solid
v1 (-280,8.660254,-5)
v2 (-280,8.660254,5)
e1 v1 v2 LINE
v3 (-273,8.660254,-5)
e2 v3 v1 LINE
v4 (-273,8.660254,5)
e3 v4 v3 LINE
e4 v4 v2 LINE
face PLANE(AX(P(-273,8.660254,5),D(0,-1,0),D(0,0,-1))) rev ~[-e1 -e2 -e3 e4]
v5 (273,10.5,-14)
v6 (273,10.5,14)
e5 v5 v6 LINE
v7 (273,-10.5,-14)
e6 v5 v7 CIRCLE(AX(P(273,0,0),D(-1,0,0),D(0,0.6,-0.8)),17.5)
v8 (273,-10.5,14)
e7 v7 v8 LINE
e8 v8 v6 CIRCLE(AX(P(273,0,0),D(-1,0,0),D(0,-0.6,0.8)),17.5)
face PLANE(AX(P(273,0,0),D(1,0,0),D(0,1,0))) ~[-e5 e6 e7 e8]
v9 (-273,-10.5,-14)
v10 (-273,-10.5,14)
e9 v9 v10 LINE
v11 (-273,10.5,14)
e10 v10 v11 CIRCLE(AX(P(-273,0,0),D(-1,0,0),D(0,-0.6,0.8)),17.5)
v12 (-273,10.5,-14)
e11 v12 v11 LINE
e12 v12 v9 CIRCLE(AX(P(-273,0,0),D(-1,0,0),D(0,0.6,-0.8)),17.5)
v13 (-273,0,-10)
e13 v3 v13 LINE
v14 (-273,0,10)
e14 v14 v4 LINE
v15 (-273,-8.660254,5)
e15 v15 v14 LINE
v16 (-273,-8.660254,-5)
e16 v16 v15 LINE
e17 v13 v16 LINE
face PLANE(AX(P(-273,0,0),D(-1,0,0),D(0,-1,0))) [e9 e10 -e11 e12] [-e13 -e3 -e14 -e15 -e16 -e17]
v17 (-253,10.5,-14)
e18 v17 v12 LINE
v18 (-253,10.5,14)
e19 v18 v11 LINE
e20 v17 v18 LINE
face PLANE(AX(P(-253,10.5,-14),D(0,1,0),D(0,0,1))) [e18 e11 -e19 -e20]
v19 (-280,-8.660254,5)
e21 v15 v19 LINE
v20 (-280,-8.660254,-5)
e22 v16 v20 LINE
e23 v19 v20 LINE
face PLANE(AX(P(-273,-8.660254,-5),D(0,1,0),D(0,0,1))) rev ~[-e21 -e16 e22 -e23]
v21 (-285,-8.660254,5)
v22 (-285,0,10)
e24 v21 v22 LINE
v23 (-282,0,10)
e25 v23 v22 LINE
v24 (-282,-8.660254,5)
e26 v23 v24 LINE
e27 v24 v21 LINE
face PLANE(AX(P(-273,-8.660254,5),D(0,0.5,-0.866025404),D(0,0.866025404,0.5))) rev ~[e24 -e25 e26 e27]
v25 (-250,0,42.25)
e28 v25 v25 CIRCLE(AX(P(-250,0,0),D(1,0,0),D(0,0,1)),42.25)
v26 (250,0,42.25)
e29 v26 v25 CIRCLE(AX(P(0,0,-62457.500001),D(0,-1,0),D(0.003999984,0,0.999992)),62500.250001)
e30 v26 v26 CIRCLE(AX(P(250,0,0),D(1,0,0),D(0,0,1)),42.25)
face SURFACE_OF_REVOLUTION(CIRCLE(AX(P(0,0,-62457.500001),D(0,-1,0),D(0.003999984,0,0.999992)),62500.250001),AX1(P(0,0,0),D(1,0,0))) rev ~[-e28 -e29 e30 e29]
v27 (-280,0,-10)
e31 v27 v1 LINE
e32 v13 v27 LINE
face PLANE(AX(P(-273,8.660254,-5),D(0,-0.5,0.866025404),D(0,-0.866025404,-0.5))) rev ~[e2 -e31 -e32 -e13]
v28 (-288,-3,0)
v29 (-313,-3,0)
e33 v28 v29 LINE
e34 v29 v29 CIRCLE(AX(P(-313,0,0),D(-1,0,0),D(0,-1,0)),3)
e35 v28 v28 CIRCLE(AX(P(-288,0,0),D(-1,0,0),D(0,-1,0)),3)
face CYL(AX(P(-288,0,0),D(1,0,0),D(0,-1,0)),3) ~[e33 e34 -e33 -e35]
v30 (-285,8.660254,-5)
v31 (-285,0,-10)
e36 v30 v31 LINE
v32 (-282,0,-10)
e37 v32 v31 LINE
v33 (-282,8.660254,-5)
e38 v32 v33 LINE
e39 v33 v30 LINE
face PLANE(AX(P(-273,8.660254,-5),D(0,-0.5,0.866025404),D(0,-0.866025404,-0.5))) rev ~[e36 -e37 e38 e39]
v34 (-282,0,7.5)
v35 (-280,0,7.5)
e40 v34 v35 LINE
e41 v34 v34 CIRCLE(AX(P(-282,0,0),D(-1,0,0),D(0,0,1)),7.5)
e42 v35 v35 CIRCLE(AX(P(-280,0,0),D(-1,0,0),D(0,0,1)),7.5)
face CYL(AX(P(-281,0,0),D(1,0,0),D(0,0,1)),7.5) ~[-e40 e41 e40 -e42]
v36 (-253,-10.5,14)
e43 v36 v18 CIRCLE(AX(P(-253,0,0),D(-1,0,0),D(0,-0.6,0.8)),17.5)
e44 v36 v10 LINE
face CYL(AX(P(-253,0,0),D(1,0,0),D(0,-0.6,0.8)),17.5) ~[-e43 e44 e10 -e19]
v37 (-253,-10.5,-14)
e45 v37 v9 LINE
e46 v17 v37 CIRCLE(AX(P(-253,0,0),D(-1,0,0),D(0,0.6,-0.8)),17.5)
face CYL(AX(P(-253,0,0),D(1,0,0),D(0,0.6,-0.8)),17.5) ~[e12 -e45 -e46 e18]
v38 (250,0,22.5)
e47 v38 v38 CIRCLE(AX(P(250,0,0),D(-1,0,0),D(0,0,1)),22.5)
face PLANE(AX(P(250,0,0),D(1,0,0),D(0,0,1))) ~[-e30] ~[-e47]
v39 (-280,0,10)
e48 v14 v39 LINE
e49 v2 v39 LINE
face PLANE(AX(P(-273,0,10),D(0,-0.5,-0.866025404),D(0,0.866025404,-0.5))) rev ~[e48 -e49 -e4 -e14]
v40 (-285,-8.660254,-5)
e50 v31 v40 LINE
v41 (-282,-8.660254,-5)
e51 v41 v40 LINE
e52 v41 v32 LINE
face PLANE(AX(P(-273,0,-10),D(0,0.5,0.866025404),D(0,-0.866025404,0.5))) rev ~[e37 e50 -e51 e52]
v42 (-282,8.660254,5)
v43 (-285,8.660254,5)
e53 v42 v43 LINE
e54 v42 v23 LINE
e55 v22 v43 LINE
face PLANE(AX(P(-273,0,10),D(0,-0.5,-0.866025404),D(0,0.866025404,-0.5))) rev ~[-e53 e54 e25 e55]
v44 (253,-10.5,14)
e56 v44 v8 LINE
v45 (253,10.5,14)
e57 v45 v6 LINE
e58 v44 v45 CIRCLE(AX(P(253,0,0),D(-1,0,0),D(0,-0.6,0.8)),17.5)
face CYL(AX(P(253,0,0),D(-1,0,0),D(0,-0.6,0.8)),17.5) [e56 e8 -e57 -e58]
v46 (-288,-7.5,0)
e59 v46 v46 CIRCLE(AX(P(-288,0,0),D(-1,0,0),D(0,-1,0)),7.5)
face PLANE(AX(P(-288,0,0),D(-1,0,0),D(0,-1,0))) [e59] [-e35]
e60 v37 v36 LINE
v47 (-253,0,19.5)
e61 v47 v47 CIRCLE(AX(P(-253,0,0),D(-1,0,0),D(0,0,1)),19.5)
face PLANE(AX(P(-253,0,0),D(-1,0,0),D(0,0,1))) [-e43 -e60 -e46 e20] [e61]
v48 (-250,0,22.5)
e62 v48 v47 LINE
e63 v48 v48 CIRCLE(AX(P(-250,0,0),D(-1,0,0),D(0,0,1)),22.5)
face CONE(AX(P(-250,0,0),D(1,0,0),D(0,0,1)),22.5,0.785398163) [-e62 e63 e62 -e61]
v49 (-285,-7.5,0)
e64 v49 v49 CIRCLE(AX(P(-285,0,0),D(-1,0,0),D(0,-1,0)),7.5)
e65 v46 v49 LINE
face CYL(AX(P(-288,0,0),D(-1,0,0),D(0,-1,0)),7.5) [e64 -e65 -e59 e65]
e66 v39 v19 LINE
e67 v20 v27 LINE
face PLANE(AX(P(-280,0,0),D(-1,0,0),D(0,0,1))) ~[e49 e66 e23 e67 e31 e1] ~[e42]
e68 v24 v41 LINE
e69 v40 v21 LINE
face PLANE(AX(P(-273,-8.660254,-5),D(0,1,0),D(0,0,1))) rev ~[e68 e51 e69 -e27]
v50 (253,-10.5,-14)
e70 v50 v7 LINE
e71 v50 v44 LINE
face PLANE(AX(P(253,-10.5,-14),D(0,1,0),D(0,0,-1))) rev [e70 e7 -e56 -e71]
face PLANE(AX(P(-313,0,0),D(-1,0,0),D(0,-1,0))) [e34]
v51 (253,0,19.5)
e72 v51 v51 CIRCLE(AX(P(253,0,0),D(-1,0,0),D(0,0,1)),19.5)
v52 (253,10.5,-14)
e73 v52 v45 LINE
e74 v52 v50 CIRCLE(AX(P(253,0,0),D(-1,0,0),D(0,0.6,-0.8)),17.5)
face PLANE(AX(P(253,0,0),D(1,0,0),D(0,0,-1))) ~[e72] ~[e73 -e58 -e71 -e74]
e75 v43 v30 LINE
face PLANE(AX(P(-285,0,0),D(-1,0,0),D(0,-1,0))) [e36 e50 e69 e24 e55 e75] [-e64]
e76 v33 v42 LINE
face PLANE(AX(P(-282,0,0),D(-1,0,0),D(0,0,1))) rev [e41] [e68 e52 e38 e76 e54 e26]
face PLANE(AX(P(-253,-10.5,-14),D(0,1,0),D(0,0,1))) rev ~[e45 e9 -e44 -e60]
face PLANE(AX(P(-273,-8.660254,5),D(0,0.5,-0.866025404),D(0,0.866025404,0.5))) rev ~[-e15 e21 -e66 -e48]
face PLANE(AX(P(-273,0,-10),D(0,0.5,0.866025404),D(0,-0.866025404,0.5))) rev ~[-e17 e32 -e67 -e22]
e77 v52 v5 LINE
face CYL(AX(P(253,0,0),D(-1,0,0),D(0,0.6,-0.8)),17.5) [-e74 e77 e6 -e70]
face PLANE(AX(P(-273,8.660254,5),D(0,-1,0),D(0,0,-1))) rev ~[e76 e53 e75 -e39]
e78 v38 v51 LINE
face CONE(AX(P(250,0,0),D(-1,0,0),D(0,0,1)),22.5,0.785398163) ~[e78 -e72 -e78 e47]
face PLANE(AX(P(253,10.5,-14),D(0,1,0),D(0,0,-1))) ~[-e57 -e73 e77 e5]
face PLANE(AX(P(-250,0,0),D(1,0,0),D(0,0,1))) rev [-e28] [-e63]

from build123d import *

# Parameters (mm, degrees)
F0_W      = 500
F0_H      = 42.25
F4_W      = 21
F4_H      = 28
F5_DEPTH  = 20
F7_DEPTH  = 15
F8_R      = 7.5
F9_DEPTH  = 3
F10_W     = 2
F10_H     = 2.5
F12_R     = 3
F13_DEPTH = 25


# Not quite as in the source:
# - a pattern or mirror of a feature is missing from the dataset's text; its kind, count and spacing are read off the source's solid


with BuildPart() as f1:
    # F0 (on Front) → F1 (revolve)
    with BuildSketch(Plane.XZ):
        with Locations((0, 21.125)):
            Rectangle(F0_W, F0_H)
        with BuildLine():
            ThreePointArc((250, 42.25), (0, 42.75), (-250, 42.25))
            Line((-250, 42.25), (250, 42.25))
        make_face()
    revolve(axis=Axis((0, 0, 0), (1, 0, 0)))

    # F2 (on Front) → F3 (revolve)
    with BuildSketch(Plane.XZ):
        Polygon((-253, 0), (-250, 0), (-250, 22.5), (-253, 19.5), align=None)
    f3 = revolve(axis=Axis((-251.5, 0, 0), (-1, 0, 0)))

    # F3_copies: F3 across plane
    add(f3.mirror(Plane(origin=(0, 0, 0), x_dir=(0, 0, 1), z_dir=(1, 0, 0))))

    # F4 (on face) → F5 (join)
    with BuildSketch(Plane(origin=(-253, 0, 0), x_dir=(0, -1, 0), z_dir=(-1, 0, 0))):
        Rectangle(F4_W, F4_H)
        with BuildLine():
            ThreePointArc((10.5, 14), (0, 17.5), (-10.5, 14))
            Line((-10.5, 14), (10.5, 14))
        make_face()
        with BuildLine():
            Line((10.5, -14), (-10.5, -14))
            ThreePointArc((-10.5, -14), (0, -17.5), (10.5, -14))
        make_face()
    f5 = extrude(amount=F5_DEPTH)

    # F5_copies: F5 across plane
    add(f5.mirror(Plane(origin=(0, 0, 0), x_dir=(0, 0, 1), z_dir=(1, 0, 0))))

    # F6 (on face) → F7 (join)
    with BuildSketch(Plane(origin=(-273, 0, 0), x_dir=(0, -1, 0), z_dir=(-1, 0, 0))):
        Polygon((0, 10), (-8.6602540378, 5), (-8.6602540378, -5), (0, -10), (8.6602540378, -5), (8.6602540378, 5), align=None)
    extrude(amount=F7_DEPTH)

    # F8 (on face) → F9 (cut)
    with BuildSketch(Plane(origin=(-288, 0, 0), x_dir=(0, -1, 0), z_dir=(-1, 0, 0))):
        Polygon((0, 10), (-8.6602540378, 5), (-8.6602540378, -5), (0, -10), (8.6602540378, -5), (8.6602540378, 5), align=None)
        Circle(F8_R, mode=Mode.SUBTRACT)
    extrude(amount=-F9_DEPTH, mode=Mode.SUBTRACT)

    # F10 (on Front) → F11 (revolve, cut)
    with BuildSketch(Plane.XZ):
        with Locations((-281, 8.75)):
            Rectangle(F10_W, F10_H)
    revolve(axis=Axis((-10, 0, 0), (-1, 0, 0)), mode=Mode.SUBTRACT)

    # F12 (on face) → F13 (join)
    with BuildSketch(Plane(origin=(-288, 0, 0), x_dir=(0, -1, 0), z_dir=(-1, 0, 0))):
        Circle(F12_R)
    extrude(amount=F13_DEPTH)


solid = f1.part
